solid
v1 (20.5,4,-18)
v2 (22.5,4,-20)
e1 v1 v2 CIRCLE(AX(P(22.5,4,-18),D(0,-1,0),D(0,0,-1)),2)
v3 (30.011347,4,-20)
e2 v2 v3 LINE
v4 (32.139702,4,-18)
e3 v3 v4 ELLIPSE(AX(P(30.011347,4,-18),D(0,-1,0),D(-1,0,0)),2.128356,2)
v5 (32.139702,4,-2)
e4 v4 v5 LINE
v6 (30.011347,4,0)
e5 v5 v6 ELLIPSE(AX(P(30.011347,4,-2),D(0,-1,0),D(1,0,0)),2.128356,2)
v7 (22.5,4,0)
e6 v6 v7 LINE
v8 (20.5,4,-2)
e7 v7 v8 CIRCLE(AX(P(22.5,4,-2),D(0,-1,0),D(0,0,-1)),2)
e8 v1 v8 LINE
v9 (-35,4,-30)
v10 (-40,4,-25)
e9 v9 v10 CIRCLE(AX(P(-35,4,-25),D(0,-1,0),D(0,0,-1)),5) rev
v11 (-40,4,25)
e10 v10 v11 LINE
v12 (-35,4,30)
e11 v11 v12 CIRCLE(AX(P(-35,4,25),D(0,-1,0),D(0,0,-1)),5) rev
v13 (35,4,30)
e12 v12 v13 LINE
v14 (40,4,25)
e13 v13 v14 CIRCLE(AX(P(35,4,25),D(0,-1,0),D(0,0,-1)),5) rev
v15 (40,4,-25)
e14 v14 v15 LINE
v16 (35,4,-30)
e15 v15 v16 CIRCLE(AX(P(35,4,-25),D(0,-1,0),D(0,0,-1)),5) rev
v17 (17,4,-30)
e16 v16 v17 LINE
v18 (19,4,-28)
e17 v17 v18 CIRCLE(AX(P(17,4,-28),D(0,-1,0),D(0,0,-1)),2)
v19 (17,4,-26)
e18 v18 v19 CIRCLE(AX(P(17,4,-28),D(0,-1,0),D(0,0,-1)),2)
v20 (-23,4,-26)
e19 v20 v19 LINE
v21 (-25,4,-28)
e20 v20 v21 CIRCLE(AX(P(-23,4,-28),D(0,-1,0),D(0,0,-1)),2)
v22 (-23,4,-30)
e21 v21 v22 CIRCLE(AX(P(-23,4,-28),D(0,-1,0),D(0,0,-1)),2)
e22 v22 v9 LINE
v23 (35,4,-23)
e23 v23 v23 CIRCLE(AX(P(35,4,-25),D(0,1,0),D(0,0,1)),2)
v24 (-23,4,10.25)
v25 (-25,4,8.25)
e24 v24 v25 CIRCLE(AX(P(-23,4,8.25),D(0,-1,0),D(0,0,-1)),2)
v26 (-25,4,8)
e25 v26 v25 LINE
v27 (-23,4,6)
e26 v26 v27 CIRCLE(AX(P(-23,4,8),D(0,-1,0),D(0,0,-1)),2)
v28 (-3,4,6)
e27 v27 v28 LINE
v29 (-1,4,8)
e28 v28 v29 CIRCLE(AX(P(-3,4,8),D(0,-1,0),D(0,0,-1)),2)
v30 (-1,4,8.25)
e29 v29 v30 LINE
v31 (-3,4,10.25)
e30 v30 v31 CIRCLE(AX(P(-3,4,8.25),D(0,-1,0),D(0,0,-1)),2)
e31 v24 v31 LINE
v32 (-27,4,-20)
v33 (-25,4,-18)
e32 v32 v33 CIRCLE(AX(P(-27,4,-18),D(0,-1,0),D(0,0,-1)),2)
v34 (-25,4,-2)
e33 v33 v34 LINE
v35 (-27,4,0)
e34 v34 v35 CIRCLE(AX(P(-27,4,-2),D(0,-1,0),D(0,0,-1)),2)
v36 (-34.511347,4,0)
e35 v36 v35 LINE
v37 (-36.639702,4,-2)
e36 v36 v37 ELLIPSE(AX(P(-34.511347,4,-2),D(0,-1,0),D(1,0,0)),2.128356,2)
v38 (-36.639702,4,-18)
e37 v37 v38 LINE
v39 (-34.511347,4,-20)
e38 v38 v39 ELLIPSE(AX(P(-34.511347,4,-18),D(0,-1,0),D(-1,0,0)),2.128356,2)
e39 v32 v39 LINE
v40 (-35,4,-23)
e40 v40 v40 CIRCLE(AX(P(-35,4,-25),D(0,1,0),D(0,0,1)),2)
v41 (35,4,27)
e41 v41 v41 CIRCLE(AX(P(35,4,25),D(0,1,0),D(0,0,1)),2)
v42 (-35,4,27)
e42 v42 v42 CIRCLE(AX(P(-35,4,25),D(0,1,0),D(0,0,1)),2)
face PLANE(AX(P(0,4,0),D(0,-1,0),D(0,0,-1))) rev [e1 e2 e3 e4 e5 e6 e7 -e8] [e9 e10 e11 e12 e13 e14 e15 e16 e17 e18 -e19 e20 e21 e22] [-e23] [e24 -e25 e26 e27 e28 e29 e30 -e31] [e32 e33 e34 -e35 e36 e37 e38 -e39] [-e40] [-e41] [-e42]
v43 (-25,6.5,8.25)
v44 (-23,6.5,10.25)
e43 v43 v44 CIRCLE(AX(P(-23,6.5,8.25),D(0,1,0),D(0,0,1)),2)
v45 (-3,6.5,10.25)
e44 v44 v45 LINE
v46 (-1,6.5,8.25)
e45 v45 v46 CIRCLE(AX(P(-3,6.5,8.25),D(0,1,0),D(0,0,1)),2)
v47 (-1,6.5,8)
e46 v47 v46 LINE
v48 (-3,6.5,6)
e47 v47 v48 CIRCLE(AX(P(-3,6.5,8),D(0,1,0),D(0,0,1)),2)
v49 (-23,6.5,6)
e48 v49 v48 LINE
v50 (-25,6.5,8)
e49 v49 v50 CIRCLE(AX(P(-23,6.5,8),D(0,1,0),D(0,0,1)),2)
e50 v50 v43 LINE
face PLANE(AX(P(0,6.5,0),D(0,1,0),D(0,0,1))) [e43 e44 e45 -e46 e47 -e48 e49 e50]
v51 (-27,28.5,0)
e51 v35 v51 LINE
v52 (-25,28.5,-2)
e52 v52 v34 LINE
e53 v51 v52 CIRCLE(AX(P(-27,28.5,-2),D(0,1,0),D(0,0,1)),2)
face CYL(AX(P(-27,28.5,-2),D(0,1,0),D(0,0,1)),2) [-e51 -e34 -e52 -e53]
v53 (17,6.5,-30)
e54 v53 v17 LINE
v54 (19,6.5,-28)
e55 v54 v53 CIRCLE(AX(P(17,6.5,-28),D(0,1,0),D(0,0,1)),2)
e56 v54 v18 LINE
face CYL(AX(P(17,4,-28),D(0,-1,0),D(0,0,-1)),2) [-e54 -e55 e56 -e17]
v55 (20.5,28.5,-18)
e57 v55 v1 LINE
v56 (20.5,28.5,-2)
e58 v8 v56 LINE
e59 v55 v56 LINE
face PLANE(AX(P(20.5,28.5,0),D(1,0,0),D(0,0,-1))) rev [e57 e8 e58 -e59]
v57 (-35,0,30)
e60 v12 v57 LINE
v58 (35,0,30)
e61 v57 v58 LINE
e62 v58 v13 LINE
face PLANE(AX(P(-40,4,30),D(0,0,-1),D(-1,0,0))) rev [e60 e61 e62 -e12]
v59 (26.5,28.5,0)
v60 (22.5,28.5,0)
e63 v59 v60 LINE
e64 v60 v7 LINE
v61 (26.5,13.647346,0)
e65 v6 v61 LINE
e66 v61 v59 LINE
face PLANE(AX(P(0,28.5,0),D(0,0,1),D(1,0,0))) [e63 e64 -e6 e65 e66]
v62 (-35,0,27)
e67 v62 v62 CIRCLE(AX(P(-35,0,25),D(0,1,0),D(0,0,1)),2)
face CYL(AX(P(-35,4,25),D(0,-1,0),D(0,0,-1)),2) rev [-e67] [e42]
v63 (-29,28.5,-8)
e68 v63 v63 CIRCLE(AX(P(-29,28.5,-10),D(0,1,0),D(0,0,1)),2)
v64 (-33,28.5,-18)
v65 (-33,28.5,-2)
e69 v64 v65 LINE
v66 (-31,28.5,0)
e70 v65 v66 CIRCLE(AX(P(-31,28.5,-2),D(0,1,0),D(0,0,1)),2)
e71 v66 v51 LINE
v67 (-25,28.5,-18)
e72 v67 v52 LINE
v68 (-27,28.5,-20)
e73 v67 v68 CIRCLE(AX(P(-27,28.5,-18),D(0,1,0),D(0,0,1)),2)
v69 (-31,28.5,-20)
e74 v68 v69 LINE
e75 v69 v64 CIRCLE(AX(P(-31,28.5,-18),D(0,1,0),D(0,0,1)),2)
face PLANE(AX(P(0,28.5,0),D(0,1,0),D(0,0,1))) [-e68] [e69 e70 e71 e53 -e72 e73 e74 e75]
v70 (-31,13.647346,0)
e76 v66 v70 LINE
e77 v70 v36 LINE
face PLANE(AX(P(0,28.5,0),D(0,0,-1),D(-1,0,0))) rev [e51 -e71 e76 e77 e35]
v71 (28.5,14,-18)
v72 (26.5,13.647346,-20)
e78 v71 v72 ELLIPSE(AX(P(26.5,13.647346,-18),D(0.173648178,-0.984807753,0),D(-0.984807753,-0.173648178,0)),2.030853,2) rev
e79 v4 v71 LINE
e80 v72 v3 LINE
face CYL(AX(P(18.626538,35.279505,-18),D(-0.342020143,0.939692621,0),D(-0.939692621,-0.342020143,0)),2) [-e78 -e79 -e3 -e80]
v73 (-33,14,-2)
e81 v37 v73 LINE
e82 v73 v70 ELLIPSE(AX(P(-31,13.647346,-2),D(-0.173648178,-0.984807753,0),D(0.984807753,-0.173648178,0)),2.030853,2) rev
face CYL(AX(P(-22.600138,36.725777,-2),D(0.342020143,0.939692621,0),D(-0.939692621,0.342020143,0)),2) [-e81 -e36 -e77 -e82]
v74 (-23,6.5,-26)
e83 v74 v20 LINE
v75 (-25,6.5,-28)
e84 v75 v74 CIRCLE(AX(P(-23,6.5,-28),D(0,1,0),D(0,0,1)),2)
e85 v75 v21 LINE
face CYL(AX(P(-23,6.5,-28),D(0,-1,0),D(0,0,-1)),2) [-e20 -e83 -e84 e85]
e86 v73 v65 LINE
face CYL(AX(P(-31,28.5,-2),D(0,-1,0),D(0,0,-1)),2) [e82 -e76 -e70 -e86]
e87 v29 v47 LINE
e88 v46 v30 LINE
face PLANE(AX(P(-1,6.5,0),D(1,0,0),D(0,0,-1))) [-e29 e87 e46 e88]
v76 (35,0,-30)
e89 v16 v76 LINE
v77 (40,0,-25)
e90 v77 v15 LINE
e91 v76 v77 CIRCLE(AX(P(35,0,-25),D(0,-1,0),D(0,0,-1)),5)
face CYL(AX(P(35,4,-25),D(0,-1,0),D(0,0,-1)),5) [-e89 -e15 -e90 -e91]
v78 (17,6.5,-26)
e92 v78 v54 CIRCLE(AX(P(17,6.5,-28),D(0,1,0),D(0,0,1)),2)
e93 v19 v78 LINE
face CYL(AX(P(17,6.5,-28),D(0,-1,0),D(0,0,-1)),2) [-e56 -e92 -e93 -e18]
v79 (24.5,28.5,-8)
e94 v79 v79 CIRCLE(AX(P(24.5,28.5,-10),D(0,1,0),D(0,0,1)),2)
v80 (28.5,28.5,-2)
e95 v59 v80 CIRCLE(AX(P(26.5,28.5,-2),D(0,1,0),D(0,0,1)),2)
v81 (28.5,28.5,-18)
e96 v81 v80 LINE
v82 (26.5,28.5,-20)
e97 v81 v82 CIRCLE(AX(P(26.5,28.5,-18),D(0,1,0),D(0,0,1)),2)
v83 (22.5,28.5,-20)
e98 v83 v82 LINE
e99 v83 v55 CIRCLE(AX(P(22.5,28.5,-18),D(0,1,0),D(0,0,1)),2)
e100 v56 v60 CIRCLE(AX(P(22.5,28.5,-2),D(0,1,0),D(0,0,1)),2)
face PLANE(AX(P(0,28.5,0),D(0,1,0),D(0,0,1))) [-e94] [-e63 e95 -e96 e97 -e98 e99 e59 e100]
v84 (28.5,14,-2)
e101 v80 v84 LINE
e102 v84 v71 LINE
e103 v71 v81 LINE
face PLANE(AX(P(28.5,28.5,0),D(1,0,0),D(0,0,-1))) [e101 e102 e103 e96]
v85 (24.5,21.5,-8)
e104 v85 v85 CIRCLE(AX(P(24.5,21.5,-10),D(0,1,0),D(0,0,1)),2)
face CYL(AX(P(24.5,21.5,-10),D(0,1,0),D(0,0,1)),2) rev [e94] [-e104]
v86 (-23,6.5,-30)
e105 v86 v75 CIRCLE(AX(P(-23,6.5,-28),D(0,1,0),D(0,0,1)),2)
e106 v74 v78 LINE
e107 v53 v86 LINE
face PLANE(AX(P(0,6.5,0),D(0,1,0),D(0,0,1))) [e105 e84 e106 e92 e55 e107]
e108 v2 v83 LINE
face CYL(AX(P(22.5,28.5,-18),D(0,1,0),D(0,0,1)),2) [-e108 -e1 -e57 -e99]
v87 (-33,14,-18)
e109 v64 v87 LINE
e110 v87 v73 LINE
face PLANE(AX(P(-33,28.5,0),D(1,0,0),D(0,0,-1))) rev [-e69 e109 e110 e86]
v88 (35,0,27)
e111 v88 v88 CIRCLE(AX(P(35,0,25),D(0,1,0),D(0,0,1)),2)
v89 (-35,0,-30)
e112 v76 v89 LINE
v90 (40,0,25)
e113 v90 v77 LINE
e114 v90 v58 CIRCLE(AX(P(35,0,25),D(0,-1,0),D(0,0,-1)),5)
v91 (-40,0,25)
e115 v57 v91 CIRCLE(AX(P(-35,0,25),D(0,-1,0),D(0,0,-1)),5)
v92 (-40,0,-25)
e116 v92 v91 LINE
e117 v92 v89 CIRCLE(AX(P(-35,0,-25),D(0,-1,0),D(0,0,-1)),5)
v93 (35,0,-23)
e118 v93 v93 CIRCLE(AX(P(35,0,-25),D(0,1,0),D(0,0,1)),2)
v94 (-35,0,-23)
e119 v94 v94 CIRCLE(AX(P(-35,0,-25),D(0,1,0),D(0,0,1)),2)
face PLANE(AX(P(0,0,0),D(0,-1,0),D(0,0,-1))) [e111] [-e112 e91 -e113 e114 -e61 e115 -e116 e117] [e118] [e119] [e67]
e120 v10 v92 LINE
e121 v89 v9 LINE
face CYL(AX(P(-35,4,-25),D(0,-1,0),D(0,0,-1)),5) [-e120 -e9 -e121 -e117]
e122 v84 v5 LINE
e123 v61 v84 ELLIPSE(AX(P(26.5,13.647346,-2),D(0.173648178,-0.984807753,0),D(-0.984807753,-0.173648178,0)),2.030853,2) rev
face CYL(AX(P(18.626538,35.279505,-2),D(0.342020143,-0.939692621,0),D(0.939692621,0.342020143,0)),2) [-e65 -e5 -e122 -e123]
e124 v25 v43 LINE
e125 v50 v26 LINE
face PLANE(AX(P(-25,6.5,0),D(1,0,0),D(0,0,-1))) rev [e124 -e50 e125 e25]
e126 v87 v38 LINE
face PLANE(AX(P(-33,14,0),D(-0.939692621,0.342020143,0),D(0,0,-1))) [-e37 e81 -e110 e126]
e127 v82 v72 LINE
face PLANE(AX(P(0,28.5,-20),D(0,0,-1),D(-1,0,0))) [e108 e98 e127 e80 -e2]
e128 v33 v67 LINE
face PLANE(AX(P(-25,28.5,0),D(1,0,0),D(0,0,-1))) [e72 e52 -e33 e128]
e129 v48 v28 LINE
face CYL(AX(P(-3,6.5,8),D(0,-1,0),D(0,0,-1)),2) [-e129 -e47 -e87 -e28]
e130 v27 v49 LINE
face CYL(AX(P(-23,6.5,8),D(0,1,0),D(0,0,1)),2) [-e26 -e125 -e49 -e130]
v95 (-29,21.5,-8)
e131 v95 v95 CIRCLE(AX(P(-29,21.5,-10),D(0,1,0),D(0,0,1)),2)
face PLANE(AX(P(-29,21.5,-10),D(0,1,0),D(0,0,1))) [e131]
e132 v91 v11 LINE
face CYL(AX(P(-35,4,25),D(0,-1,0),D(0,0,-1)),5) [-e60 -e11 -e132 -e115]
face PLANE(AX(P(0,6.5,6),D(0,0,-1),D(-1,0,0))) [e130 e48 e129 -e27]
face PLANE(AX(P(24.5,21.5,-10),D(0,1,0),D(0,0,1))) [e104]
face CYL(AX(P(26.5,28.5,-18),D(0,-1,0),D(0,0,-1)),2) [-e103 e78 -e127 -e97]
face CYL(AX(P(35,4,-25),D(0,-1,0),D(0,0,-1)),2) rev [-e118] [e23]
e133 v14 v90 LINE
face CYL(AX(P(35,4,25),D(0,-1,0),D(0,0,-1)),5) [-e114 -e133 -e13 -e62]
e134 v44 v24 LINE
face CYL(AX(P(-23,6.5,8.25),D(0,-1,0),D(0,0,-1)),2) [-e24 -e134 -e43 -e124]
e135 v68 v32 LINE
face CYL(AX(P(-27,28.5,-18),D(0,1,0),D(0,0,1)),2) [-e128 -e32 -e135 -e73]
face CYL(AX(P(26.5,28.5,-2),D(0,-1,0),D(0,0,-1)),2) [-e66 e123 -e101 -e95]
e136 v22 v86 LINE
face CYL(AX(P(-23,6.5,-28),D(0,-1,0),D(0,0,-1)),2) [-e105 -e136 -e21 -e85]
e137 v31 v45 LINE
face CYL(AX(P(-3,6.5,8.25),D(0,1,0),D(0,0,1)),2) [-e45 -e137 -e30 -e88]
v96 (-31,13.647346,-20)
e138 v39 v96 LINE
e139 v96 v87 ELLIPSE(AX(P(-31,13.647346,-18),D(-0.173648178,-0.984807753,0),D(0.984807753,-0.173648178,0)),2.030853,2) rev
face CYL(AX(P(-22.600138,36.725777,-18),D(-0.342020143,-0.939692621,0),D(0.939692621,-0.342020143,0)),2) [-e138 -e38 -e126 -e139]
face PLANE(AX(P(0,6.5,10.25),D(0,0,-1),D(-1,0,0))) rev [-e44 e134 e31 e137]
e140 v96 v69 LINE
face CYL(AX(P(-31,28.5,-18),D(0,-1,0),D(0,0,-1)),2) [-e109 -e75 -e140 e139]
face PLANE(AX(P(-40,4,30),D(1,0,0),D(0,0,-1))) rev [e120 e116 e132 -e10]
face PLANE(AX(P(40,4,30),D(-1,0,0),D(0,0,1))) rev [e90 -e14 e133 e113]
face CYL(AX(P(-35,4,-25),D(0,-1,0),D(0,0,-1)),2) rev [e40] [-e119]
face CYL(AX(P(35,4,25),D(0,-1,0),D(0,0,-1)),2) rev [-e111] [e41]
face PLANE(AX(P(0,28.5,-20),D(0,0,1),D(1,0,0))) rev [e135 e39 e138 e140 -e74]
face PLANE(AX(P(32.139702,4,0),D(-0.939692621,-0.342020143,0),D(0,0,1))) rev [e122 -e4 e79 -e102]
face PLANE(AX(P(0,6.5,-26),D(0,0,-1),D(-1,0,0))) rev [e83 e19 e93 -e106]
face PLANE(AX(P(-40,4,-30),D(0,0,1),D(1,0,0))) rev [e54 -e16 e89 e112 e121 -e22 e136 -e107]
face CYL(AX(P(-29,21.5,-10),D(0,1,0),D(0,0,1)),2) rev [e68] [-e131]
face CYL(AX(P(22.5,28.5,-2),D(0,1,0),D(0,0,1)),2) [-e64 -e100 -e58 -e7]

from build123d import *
from OCP.BRepFilletAPI import BRepFilletAPI_MakeChamfer

# Parameters (mm, degrees)
SKETCH_1_W          = 80
SKETCH_1_H          = 60
SKETCH_1_R          = 2
EXTRUDE_1_DEPTH     = 4
FILLET_1_R          = 5
SKETCH_2_W          = 44
SKETCH_2_H          = 4
SKETCH_2_W_2        = 24
SKETCH_2_H_2        = 4.25
EXTRUDE_2_DEPTH     = 2.5
SKETCH_2_3_W        = 8
SKETCH_2_3_H        = 20
EXTRUDE_3_DEPTH     = 24.5
SKETCH_3_R          = 2
CUT_EXTRUDE_1_DEPTH = 7
CHAMFER_1_SIZE      = 10
CHAMFER_1_SIZE2     = 3.639702343
FILLET_2_R          = 2
FILLET_3_R          = 2


with BuildPart() as part:
    # Эскиз1 → Бобышка-Вытянуть1 (new body)
    with BuildSketch(Plane(origin=(0, 0, 0), x_dir=(1, 0, 0), z_dir=(0, 1, 0))):
        Rectangle(SKETCH_1_W, SKETCH_1_H)
        with Locations(Location((-35, 25, 0), (0, 0, 270))):
            Circle(SKETCH_1_R, mode=Mode.SUBTRACT)
        with Locations(Location((35, 25, 0), (0, 0, 270))):
            Circle(SKETCH_1_R, mode=Mode.SUBTRACT)
        with Locations(Location((-35, -25, 0), (0, 0, 270))):
            Circle(SKETCH_1_R, mode=Mode.SUBTRACT)
        with Locations(Location((35, -25, 0), (0, 0, 270))):
            Circle(SKETCH_1_R, mode=Mode.SUBTRACT)
    extrude(amount=EXTRUDE_1_DEPTH)

    # Скругление1
    fillet_1_edges = [part.edges().sort_by_distance(p)[0] for p in [
        (40, 2, 30),
        (-40, 2, 30),
        (-40, 2, -30),
        (40, 2, -30),
    ]]
    fillet(fillet_1_edges, radius=FILLET_1_R)

    # Эскиз2 → Бобышка-Вытянуть2 (add)
    with BuildSketch(Plane(origin=(0, 4, 0), x_dir=(1, 0, 0), z_dir=(0, 1, 0))):
        with Locations((-3, 28)):
            Rectangle(SKETCH_2_W, SKETCH_2_H)
        with Locations((-13, -8.125)):
            Rectangle(SKETCH_2_W_2, SKETCH_2_H_2)
    extrude(amount=EXTRUDE_2_DEPTH)

    # Эскиз2<3> → Бобышка-Вытянуть3 (add)
    with BuildSketch(Plane(origin=(0, 4, 0), x_dir=(1, 0, 0), z_dir=(0, 1, 0))):
        with Locations((24.5, 10)):
            Rectangle(SKETCH_2_3_W, SKETCH_2_3_H)
        with Locations((-29, 10)):
            Rectangle(SKETCH_2_3_W, SKETCH_2_3_H)
    extrude(amount=EXTRUDE_3_DEPTH)

    # Эскиз3 → Вырез-Вытянуть1 (cut)
    with BuildSketch(Plane(origin=(0, 28.5, 0), x_dir=(1, 0, 0), z_dir=(0, 1, 0))):
        with Locations(Location((-29, 10, 0), (0, 0, 270))):
            Circle(SKETCH_3_R)
        with Locations(Location((24.5, 10, 0), (0, 0, 270))):
            Circle(SKETCH_3_R)
    extrude(amount=-CUT_EXTRUDE_1_DEPTH, mode=Mode.SUBTRACT)

    # Фаска1: one chamfer whose edges measure the first distance from different faces: ONE call of the kernel's chamfer builder (chamfer() names one face for all edges)
    chamfer_1_edges_1 = [part.edges().sort_by_distance(p)[0] for p in [
        (28.5, 4, -10),
    ]]
    chamfer_1_side_1 = [part.faces().sort_by_distance(p)[0] for p in [
        (28.5, 16.25, -10),
    ]]
    chamfer_1_edges_2 = [part.edges().sort_by_distance(p)[0] for p in [
        (-33, 4, -10),
    ]]
    chamfer_1_side_2 = [part.faces().sort_by_distance(p)[0] for p in [
        (-33, 16.25, -10),
    ]]
    chamfer_1 = BRepFilletAPI_MakeChamfer(part.part.solid().wrapped)
    for e in chamfer_1_edges_1:
        chamfer_1.Add(CHAMFER_1_SIZE, CHAMFER_1_SIZE2, e.wrapped, chamfer_1_side_1[0].wrapped)  # the first distance lies on this face
    for e in chamfer_1_edges_2:
        chamfer_1.Add(CHAMFER_1_SIZE, CHAMFER_1_SIZE2, e.wrapped, chamfer_1_side_2[0].wrapped)  # the first distance lies on this face
    add(Compound.cast(chamfer_1.Shape()), mode=Mode.REPLACE)

    # Скругление2
    fillet_2_edges = [part.edges().sort_by_distance(p)[0] for p in [
        (-34.819851171, 9, 0),
        (-34.819851171, 9, -20),
        (30.319851171, 9, 0),
        (30.319851171, 9, -20),
        (28.5, 21.25, -20),
        (20.5, 16.25, -20),
        (20.5, 16.25, 0),
        (28.5, 21.25, 0),
        (-25, 16.25, 0),
        (-25, 16.25, -20),
        (-33, 21.25, -20),
        (-33, 21.25, 0),
    ]]
    fillet(fillet_2_edges, radius=FILLET_2_R)

    # Скругление3
    fillet_3_edges = [part.edges().sort_by_distance(p)[0] for p in [
        (-25, 5.25, -26),
        (19, 5.25, -30),
        (-25, 5.25, -30),
        (19, 5.25, -26),
        (-1, 5.25, 6),
        (-25, 5.25, 6),
        (-25, 5.25, 10.25),
        (-1, 5.25, 10.25),
    ]]
    fillet(fillet_3_edges, radius=FILLET_3_R - 0.0001)  # a hair under: the kernel refuses the full size


solid = part.part
